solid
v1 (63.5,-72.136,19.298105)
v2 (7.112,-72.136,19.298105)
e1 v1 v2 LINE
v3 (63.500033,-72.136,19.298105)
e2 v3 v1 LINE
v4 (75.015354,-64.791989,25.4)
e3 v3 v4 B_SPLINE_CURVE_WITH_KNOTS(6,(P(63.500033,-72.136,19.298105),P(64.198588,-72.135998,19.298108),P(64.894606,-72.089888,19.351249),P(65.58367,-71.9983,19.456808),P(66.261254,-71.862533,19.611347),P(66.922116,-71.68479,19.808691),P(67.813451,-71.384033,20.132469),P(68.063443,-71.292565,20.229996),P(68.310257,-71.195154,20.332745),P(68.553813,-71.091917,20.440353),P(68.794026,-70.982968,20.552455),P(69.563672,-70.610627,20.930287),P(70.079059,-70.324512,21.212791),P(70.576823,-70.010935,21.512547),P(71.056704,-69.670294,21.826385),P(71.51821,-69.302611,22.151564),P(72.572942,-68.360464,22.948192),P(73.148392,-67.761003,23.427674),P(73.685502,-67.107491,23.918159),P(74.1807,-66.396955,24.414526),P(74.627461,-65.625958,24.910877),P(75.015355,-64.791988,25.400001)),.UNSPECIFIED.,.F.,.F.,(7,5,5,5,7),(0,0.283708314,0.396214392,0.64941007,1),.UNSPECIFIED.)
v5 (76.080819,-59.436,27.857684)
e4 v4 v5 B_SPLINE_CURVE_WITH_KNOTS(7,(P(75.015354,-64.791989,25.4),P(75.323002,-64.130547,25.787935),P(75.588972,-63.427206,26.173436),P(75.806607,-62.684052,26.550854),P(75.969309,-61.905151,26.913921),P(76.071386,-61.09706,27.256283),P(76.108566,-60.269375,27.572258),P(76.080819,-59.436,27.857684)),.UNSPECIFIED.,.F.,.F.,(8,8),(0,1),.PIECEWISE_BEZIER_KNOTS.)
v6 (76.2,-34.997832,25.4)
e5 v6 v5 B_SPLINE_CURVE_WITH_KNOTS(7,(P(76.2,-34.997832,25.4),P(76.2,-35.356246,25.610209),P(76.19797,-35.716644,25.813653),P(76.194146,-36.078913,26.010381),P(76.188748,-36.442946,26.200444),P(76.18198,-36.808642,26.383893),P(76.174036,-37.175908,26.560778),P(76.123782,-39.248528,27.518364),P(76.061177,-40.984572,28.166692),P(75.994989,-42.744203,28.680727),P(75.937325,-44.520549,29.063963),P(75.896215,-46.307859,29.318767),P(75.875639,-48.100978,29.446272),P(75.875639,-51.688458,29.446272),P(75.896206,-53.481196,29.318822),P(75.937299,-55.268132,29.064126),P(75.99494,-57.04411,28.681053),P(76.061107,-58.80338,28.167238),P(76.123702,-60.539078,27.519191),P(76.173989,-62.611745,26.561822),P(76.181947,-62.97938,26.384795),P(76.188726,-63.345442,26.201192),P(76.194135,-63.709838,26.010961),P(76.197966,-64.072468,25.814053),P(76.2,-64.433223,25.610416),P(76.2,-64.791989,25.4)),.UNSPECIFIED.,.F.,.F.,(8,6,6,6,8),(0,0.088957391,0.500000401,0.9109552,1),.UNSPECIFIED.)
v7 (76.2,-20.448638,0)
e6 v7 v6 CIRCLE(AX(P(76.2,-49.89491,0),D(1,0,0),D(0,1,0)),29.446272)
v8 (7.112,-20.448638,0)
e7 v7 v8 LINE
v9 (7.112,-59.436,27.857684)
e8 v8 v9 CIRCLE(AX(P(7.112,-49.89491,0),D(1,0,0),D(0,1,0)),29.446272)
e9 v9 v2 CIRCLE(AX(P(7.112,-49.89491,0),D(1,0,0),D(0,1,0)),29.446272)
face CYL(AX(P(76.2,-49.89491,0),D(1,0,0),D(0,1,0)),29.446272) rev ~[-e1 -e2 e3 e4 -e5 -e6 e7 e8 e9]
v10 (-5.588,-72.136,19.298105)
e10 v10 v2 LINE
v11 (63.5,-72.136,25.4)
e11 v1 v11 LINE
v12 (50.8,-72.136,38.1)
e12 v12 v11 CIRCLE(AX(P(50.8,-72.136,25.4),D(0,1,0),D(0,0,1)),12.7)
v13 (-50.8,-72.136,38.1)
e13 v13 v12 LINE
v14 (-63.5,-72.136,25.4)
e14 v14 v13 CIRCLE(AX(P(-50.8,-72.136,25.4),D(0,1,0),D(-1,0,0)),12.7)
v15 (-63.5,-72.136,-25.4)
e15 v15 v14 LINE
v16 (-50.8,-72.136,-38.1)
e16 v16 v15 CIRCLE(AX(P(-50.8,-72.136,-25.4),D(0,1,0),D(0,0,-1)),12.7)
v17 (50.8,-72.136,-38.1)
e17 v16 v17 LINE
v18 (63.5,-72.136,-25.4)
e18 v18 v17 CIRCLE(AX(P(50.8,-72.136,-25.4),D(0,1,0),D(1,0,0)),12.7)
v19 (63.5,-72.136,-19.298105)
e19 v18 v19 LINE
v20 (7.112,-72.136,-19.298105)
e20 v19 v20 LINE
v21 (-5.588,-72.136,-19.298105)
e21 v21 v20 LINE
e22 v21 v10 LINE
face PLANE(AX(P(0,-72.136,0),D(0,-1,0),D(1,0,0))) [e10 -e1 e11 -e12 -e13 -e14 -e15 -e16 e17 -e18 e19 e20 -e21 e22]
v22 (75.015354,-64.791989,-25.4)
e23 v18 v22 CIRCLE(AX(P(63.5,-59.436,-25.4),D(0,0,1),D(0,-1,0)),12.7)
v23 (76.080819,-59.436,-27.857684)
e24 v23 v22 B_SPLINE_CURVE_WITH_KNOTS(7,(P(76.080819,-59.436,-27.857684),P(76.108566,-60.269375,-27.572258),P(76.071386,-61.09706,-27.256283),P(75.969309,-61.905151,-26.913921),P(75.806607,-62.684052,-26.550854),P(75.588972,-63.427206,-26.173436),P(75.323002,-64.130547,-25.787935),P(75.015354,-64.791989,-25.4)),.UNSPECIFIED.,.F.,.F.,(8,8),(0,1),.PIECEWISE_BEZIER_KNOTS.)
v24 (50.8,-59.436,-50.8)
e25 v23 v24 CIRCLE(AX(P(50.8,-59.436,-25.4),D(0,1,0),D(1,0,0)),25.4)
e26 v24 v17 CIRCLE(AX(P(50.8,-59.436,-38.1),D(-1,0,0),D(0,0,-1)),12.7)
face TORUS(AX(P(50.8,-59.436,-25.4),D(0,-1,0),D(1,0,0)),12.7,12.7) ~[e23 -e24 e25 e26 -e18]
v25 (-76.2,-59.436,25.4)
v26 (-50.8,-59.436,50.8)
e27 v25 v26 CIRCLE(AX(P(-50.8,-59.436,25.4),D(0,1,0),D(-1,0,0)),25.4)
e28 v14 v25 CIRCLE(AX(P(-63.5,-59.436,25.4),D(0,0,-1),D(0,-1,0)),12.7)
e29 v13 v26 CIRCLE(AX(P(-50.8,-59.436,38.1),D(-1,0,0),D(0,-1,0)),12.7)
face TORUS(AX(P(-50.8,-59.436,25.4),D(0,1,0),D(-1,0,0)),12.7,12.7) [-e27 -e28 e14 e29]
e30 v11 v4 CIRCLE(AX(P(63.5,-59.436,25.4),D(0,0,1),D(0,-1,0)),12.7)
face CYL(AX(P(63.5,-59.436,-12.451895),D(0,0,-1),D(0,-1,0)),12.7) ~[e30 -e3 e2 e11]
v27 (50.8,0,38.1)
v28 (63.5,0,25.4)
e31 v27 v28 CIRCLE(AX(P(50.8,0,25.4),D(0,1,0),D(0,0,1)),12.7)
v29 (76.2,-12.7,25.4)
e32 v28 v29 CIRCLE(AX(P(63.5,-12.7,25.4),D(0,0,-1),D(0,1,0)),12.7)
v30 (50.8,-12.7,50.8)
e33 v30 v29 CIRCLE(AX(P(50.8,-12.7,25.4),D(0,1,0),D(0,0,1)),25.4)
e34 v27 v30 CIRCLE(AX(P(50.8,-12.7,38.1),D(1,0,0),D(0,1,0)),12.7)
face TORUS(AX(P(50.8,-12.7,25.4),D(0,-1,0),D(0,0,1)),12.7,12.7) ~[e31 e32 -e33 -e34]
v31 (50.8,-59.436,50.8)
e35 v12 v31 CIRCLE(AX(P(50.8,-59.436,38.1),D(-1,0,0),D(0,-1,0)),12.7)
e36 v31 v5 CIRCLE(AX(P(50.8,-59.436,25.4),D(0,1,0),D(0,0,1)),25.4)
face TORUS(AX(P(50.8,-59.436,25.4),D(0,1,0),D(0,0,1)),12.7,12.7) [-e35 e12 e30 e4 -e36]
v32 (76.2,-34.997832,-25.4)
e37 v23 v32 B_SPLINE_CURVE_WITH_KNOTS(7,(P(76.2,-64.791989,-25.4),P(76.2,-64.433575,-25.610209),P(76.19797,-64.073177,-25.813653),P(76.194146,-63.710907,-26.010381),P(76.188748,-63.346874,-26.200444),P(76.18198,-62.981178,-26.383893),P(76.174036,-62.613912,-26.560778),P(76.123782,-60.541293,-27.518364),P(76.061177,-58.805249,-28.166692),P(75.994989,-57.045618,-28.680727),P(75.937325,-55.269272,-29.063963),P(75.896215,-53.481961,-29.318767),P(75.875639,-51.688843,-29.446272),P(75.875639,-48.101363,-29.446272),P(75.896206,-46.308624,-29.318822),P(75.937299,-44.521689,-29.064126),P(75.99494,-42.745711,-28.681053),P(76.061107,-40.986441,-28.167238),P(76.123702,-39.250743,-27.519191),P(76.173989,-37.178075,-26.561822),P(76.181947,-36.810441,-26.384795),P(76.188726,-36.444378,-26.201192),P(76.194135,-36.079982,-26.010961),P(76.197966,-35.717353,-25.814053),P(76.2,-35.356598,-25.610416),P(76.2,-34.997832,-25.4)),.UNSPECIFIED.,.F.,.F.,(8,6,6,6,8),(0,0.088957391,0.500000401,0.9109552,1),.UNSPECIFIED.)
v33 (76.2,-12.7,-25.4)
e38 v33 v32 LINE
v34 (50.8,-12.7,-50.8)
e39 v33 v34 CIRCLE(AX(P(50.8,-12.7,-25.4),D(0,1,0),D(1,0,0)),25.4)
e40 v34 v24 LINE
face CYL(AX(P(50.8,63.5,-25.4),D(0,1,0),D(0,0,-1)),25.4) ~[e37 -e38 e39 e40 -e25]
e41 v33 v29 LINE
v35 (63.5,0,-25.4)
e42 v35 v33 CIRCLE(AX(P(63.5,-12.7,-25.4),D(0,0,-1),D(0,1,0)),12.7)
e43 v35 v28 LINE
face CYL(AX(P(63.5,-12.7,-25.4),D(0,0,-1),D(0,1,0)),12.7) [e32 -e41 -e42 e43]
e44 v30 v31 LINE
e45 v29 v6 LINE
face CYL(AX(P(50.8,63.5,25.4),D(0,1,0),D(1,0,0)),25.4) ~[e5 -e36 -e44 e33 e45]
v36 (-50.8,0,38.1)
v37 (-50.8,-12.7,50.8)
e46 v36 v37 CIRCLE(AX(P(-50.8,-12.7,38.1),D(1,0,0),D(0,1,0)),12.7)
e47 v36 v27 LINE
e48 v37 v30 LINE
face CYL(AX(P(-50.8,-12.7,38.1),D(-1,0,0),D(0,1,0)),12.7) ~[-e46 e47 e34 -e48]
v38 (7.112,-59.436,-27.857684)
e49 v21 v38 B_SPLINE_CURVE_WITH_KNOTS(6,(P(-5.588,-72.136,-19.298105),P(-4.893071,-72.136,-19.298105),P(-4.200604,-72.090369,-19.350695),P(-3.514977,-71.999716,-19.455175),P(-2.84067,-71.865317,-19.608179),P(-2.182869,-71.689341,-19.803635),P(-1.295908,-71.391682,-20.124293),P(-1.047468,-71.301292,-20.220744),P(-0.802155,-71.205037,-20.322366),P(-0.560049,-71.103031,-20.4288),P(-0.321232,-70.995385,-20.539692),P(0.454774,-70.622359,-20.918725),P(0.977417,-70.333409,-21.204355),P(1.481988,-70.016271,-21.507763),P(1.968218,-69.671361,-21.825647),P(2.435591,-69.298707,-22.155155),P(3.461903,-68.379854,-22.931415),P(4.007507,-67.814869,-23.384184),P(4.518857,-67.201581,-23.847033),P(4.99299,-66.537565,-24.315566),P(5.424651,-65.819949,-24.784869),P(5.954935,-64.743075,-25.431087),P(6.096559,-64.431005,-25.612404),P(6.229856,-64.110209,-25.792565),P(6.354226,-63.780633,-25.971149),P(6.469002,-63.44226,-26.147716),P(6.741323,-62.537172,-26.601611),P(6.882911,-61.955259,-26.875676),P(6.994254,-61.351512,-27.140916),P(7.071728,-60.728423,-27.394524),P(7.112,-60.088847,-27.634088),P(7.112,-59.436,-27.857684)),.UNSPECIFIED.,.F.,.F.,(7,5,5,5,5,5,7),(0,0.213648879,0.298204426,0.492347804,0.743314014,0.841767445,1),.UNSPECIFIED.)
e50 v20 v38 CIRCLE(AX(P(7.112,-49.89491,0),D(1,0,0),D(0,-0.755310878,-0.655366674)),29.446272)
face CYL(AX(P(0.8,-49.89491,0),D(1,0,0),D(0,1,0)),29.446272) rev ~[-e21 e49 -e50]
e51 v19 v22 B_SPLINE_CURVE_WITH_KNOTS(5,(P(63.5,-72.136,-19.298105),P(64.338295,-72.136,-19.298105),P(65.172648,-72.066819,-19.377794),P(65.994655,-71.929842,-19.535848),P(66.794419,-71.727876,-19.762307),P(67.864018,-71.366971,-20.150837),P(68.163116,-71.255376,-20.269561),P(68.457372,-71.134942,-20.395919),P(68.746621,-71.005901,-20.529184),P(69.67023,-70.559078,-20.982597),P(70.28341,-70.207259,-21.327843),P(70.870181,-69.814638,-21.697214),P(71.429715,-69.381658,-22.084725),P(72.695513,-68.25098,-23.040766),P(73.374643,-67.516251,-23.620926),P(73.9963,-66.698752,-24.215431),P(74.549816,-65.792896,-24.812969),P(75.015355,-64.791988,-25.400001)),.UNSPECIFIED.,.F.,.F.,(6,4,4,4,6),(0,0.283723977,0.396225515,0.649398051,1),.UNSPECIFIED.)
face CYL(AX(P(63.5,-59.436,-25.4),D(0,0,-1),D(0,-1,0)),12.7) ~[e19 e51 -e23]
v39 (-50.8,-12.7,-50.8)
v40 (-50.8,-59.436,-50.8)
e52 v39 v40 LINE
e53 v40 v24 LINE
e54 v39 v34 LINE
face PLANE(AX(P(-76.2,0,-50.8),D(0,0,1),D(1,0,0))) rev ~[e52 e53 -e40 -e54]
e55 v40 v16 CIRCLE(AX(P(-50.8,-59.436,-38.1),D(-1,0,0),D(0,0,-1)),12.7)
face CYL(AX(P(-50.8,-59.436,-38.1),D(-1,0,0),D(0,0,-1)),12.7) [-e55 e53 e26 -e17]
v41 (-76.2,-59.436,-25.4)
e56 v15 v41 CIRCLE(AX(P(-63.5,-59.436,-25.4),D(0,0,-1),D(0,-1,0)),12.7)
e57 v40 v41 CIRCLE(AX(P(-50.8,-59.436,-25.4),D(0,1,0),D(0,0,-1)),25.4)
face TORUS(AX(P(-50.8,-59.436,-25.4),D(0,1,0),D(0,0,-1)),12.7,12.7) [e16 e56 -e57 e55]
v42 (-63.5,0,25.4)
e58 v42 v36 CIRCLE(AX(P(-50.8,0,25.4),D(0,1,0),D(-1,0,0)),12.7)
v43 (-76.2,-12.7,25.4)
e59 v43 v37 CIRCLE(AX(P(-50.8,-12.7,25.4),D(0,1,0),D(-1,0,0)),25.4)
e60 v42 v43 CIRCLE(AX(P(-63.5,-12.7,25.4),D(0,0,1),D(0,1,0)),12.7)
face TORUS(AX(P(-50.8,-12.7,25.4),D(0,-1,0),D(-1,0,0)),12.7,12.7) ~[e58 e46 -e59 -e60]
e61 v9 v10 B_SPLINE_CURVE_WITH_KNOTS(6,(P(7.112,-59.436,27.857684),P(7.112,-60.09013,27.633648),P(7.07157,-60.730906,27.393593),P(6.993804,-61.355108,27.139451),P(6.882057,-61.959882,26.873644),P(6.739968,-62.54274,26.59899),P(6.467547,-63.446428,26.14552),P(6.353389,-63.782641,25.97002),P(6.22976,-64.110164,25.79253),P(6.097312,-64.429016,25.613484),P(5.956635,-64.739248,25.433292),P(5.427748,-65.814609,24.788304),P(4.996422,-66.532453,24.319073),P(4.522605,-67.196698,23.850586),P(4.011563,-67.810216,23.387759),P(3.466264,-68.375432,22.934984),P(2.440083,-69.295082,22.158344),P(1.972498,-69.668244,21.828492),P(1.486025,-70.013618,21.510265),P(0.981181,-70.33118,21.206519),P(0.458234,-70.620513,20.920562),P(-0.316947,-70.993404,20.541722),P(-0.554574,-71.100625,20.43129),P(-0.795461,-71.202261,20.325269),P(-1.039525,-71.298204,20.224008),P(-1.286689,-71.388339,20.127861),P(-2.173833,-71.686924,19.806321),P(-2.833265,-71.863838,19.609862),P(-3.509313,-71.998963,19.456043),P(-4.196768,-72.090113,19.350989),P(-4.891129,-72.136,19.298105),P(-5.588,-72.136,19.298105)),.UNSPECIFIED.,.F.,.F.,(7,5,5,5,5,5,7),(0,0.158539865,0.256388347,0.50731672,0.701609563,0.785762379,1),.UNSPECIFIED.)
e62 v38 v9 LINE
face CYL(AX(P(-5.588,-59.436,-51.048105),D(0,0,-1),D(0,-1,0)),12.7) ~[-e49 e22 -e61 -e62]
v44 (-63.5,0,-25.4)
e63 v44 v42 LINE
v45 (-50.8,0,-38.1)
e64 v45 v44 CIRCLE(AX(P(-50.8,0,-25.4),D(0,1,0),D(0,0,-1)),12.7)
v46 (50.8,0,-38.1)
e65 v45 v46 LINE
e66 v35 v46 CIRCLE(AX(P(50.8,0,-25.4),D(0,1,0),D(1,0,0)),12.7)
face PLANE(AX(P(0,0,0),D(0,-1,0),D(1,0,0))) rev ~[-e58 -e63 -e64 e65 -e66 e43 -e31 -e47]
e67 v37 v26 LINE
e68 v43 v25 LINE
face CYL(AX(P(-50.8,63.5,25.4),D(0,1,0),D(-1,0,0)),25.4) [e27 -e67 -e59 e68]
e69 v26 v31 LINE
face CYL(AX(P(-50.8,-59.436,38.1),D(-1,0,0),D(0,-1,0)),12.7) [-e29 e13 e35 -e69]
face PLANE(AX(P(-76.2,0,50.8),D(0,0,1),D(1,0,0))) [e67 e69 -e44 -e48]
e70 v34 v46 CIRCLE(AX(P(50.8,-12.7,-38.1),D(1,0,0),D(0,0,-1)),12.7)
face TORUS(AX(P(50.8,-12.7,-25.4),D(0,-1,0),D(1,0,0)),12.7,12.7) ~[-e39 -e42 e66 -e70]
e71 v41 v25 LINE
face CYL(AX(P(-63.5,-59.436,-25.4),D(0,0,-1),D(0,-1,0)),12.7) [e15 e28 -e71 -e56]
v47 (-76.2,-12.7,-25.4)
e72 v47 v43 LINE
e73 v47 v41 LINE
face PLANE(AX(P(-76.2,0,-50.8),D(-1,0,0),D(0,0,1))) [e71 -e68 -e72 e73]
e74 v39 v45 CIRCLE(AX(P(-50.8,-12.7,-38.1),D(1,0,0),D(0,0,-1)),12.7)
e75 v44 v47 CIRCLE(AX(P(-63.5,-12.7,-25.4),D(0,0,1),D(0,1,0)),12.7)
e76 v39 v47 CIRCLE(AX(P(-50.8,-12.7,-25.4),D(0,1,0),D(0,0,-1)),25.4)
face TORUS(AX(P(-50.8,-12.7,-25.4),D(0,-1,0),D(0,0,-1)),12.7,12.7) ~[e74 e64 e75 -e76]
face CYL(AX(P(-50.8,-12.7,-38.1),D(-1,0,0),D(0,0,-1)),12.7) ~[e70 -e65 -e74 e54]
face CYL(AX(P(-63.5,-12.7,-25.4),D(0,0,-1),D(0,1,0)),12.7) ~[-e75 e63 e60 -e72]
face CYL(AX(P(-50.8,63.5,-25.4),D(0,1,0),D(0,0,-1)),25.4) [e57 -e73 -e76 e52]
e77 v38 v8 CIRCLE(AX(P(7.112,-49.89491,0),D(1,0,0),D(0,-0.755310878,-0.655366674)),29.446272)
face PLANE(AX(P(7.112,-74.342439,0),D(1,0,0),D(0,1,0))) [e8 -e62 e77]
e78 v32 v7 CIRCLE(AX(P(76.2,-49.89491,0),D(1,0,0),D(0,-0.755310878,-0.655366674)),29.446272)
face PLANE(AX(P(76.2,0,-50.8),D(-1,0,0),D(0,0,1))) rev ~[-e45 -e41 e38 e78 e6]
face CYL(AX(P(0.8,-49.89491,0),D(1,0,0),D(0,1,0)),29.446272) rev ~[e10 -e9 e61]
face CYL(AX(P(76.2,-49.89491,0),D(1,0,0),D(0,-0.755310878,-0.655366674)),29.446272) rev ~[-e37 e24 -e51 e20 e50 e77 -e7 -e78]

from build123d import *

# Parameters (mm, degrees)
F0_W         = 152.4
F0_H         = 101.6
F1_DEPTH     = 72.136
F3_DEPTH     = 69.088
F4_T1_DEPTH  = 199.136
F5_T1_DEPTH  = 101.6
F5_T3_DEPTH  = 50.8
F5_T5_DEPTH  = 37.8518945456
F5_T7_DEPTH  = 37.8518945456
F5_T12_DEPTH = 102.0962109088
F5_S13_R     = 29.4462721735
F5_T14_DEPTH = 53
F5_T16_ANGLE = 89.9999999994
F5_T18_ANGLE = 89.9999999994
F5_T20_ANGLE = 89.9999999994
F5_T22_ANGLE = 89.9999999994
F5_T24_ANGLE = 89.9999999994
F5_T26_ANGLE = 89.9999999994
F5_T28_ANGLE = 89.9999999994
F5_T30_ANGLE = 89.9999999994


# Not quite as in the source:
# - a fillet or chamfer that OpenCascade refuses, or shapes differently, is made with other operations: its cross-section is extruded or revolved along the edge and cut away or added


with BuildPart() as f1:
    # F0 (on Front) → F1 (new body)
    with BuildSketch(Plane.XZ):
        Rectangle(F0_W, F0_H)
    extrude(amount=F1_DEPTH)

    # F2 (on face) → F3 (cut)
    with BuildSketch(Plane.YZ.offset(76.2)):
        with BuildLine():
            Line((-72.136, -19.2981054544), (-72.136, 19.2981054544))
            ThreePointArc((-72.136, 19.2981054544), (-79.3411824793, 0), (-72.136, -19.2981054544))
        make_face()
        with BuildLine():
            ThreePointArc((-72.136, -19.2981054544), (-39.5952558372, -27.5862295855), (-20.4486381322, 0))
            ThreePointArc((-20.4486381322, 0), (-39.5952558372, 27.5862295855), (-72.136, 19.2981054544))
            Line((-72.136, 19.2981054544), (-72.136, -19.2981054544))
        make_face()
    extrude(amount=-F3_DEPTH, mode=Mode.SUBTRACT)

    # F4: fillet of radius 25.4 on 4 edges, made by hand

    # F4_s2 → F4_t1 (cut)
    with BuildSketch(Plane.XZ.offset(-63.5)):
        with BuildLine():
            ThreePointArc((50.8, -50.8), (68.7605122421, -43.3605122421), (76.2, -25.4))
            Line((76.2, -25.4), (76.2, -50.8))
            Line((76.2, -50.8), (50.8, -50.8))
        make_face()
        with BuildLine():
            ThreePointArc((-50.8, -50.8), (-68.7605122421, -43.3605122421), (-76.2, -25.4))
            Line((-76.2, -25.4), (-76.2, -50.8))
            Line((-76.2, -50.8), (-50.8, -50.8))
        make_face()
        with BuildLine():
            ThreePointArc((76.2, 25.4), (68.7605122421, 43.3605122421), (50.8, 50.8))
            Line((50.8, 50.8), (76.2, 50.8))
            Line((76.2, 50.8), (76.2, 25.4))
        make_face()
        with BuildLine():
            ThreePointArc((-76.2, 25.4), (-68.7605122421, 43.3605122421), (-50.8, 50.8))
            Line((-50.8, 50.8), (-76.2, 50.8))
            Line((-76.2, 50.8), (-76.2, 25.4))
        make_face()
    extrude(amount=F4_T1_DEPTH, mode=Mode.SUBTRACT)

    # F5: fillet of radius 12.7 on 16 edges, made by hand

    # F5_s2 → F5_t1 (cut)
    with BuildSketch(Plane.YZ.offset(-50.8)):
        with BuildLine():
            ThreePointArc((-72.136, 38.1), (-68.4162561211, 47.0802561211), (-59.436, 50.8))
            Line((-59.436, 50.8), (-72.136, 50.8))
            Line((-72.136, 50.8), (-72.136, 38.1))
        make_face()
        with BuildLine():
            ThreePointArc((0, 38.1), (-3.7197438789, 47.0802561211), (-12.7, 50.8))
            Line((-12.7, 50.8), (0, 50.8))
            Line((0, 50.8), (0, 38.1))
        make_face()
        with BuildLine():
            ThreePointArc((-12.7, -50.8), (-3.7197438789, -47.0802561211), (0, -38.1))
            Line((0, -38.1), (0, -50.8))
            Line((0, -50.8), (-12.7, -50.8))
        make_face()
        with BuildLine():
            ThreePointArc((-59.436, -50.8), (-68.4162561211, -47.0802561211), (-72.136, -38.1))
            Line((-72.136, -38.1), (-72.136, -50.8))
            Line((-72.136, -50.8), (-59.436, -50.8))
        make_face()
    extrude(amount=F5_T1_DEPTH, mode=Mode.SUBTRACT)

    # F5_s4 → F5_t3 (cut)
    with BuildSketch(Plane.XY.offset(-25.4)):
        with BuildLine():
            ThreePointArc((-63.5, 0), (-72.4802561211, -3.7197438789), (-76.2, -12.7))
            Line((-76.2, -12.7), (-76.2, 0))
            Line((-76.2, 0), (-63.5, 0))
        make_face()
        with BuildLine():
            ThreePointArc((63.5, 0), (72.4802561211, -3.7197438789), (76.2, -12.7))
            Line((76.2, -12.7), (76.2, 0))
            Line((76.2, 0), (63.5, 0))
        make_face()
        with BuildLine():
            ThreePointArc((-63.5, -72.136), (-72.4802561211, -68.4162561211), (-76.2, -59.436))
            Line((-76.2, -59.436), (-76.2, -72.136))
            Line((-76.2, -72.136), (-63.5, -72.136))
        make_face()
    extrude(amount=F5_T3_DEPTH, mode=Mode.SUBTRACT)

    # F5_s6 → F5_t5 (cut)
    with BuildSketch(Plane.XY.offset(-12.4518945456)):
        with BuildLine():
            ThreePointArc((63.5, -72.136), (72.4802561211, -68.4162561211), (76.2, -59.436))
            Line((76.2, -59.436), (76.2, -72.136))
            Line((76.2, -72.136), (63.5, -72.136))
        make_face()
    extrude(amount=F5_T5_DEPTH, mode=Mode.SUBTRACT)

    # F5_s8 → F5_t7 (cut)
    with BuildSketch(Plane.XY.offset(-25.4)):
        with BuildLine():
            ThreePointArc((63.5, -72.136), (72.4802561211, -68.4162561211), (76.2, -59.436))
            Line((76.2, -59.436), (76.2, -72.136))
            Line((76.2, -72.136), (63.5, -72.136))
        make_face()
    extrude(amount=F5_T7_DEPTH, mode=Mode.SUBTRACT)


with BuildPart() as f5_tool10:
    # F5_s11 → F5_t12 (new body)
    with BuildSketch(Plane.XY.offset(-51.0481054544)):
        with BuildLine():
            ThreePointArc((-5.588, -72.136), (3.3922561211, -68.4162561211), (7.112, -59.436))
            Line((7.112, -59.436), (7.112, -72.136))
            Line((7.112, -72.136), (-5.588, -72.136))
        make_face()
    extrude(amount=F5_T12_DEPTH)

    # F5_s13 → F5_t14 (intersect, symmetric)
    with BuildSketch(Plane.YZ.offset(0.8)):
        with Locations((-49.8949103057, 0)):
            Circle(F5_S13_R)
    extrude(amount=F5_T14_DEPTH, both=True, mode=Mode.INTERSECT)


with BuildPart() as f1_1:
    add(f1.part)

    # F5_t9: cut F5_tool10
    add(f5_tool10.part, mode=Mode.SUBTRACT)

    # F5_s15 → F5_t16 (revolve, cut)
    with BuildSketch(Plane.YZ.offset(-50.7999999999)):
        with BuildLine():
            ThreePointArc((0, -38.1), (-3.7197438789, -47.0802561211), (-12.7, -50.8))
            Line((-12.7, -50.8), (0, -50.8))
            Line((0, -50.8), (0, -38.1))
        make_face()
    revolve(axis=Axis((-50.7999999999, 0, -25.3999999999), (0, 1, 0)), revolution_arc=F5_T16_ANGLE, mode=Mode.SUBTRACT)

    # F5_s17 → F5_t18 (revolve, cut)
    with BuildSketch(Plane.XY.offset(25.3999999999)):
        with BuildLine():
            ThreePointArc((-63.5, 0), (-72.4802561211, -3.7197438789), (-76.2, -12.7))
            Line((-76.2, -12.7), (-76.2, 0))
            Line((-76.2, 0), (-63.5, 0))
        make_face()
    revolve(axis=Axis((-50.7999999999, 0, 25.3999999999), (0, 1, 0)), revolution_arc=F5_T18_ANGLE, mode=Mode.SUBTRACT)

    # F5_s19 → F5_t20 (revolve, cut)
    with BuildSketch(Plane.YZ.offset(50.7999999999)):
        with BuildLine():
            ThreePointArc((0, 38.1), (-3.7197438789, 47.0802561211), (-12.7, 50.8))
            Line((-12.7, 50.8), (0, 50.8))
            Line((0, 50.8), (0, 38.1))
        make_face()
    revolve(axis=Axis((50.7999999999, 0, 25.3999999999), (0, 1, 0)), revolution_arc=F5_T20_ANGLE, mode=Mode.SUBTRACT)

    # F5_s21 → F5_t22 (revolve, cut)
    with BuildSketch(Plane.XY.offset(-25.3999999999)):
        with BuildLine():
            ThreePointArc((63.5, 0), (72.4802561211, -3.7197438789), (76.2, -12.7))
            Line((76.2, -12.7), (76.2, 0))
            Line((76.2, 0), (63.5, 0))
        make_face()
    revolve(axis=Axis((50.7999999999, 0, -25.3999999999), (0, 1, 0)), revolution_arc=F5_T22_ANGLE, mode=Mode.SUBTRACT)

    # F5_s23 → F5_t24 (revolve, cut)
    with BuildSketch(Plane.XY.offset(-25.3999999999)):
        with BuildLine():
            ThreePointArc((76.2, -59.436), (72.4802561211, -68.4162561211), (63.5, -72.136))
            Line((63.5, -72.136), (76.2, -72.136))
            Line((76.2, -72.136), (76.2, -59.436))
        make_face()
    revolve(axis=Axis((50.7999999999, -72.136, -25.3999999999), (0, 1, 0)), revolution_arc=F5_T24_ANGLE, mode=Mode.SUBTRACT)

    # F5_s25 → F5_t26 (revolve, cut)
    with BuildSketch(Plane.XY.offset(25.3999999999)):
        with BuildLine():
            ThreePointArc((-63.5, -72.136), (-72.4802561211, -68.4162561211), (-76.2, -59.436))
            Line((-76.2, -59.436), (-76.2, -72.136))
            Line((-76.2, -72.136), (-63.5, -72.136))
        make_face()
    revolve(axis=Axis((-50.7999999999, -72.136, 25.3999999999), (0, 1, 0)), revolution_arc=F5_T26_ANGLE, mode=Mode.SUBTRACT)

    # F5_s27 → F5_t28 (revolve, cut)
    with BuildSketch(Plane.YZ.offset(50.7999999999)):
        with BuildLine():
            ThreePointArc((-72.136, 38.1), (-68.4162561211, 47.0802561211), (-59.436, 50.8))
            Line((-59.436, 50.8), (-72.136, 50.8))
            Line((-72.136, 50.8), (-72.136, 38.1))
        make_face()
    revolve(axis=Axis((50.7999999999, -72.136, 25.3999999999), (0, 1, 0)), revolution_arc=F5_T28_ANGLE, mode=Mode.SUBTRACT)

    # F5_s29 → F5_t30 (revolve, cut)
    with BuildSketch(Plane.YZ.offset(-50.7999999999)):
        with BuildLine():
            ThreePointArc((-72.136, -38.1), (-68.4162561211, -47.0802561211), (-59.436, -50.8))
            Line((-59.436, -50.8), (-72.136, -50.8))
            Line((-72.136, -50.8), (-72.136, -38.1))
        make_face()
    revolve(axis=Axis((-50.7999999999, -72.136, -25.3999999999), (0, 1, 0)), revolution_arc=F5_T30_ANGLE, mode=Mode.SUBTRACT)


solid = f1_1.part
